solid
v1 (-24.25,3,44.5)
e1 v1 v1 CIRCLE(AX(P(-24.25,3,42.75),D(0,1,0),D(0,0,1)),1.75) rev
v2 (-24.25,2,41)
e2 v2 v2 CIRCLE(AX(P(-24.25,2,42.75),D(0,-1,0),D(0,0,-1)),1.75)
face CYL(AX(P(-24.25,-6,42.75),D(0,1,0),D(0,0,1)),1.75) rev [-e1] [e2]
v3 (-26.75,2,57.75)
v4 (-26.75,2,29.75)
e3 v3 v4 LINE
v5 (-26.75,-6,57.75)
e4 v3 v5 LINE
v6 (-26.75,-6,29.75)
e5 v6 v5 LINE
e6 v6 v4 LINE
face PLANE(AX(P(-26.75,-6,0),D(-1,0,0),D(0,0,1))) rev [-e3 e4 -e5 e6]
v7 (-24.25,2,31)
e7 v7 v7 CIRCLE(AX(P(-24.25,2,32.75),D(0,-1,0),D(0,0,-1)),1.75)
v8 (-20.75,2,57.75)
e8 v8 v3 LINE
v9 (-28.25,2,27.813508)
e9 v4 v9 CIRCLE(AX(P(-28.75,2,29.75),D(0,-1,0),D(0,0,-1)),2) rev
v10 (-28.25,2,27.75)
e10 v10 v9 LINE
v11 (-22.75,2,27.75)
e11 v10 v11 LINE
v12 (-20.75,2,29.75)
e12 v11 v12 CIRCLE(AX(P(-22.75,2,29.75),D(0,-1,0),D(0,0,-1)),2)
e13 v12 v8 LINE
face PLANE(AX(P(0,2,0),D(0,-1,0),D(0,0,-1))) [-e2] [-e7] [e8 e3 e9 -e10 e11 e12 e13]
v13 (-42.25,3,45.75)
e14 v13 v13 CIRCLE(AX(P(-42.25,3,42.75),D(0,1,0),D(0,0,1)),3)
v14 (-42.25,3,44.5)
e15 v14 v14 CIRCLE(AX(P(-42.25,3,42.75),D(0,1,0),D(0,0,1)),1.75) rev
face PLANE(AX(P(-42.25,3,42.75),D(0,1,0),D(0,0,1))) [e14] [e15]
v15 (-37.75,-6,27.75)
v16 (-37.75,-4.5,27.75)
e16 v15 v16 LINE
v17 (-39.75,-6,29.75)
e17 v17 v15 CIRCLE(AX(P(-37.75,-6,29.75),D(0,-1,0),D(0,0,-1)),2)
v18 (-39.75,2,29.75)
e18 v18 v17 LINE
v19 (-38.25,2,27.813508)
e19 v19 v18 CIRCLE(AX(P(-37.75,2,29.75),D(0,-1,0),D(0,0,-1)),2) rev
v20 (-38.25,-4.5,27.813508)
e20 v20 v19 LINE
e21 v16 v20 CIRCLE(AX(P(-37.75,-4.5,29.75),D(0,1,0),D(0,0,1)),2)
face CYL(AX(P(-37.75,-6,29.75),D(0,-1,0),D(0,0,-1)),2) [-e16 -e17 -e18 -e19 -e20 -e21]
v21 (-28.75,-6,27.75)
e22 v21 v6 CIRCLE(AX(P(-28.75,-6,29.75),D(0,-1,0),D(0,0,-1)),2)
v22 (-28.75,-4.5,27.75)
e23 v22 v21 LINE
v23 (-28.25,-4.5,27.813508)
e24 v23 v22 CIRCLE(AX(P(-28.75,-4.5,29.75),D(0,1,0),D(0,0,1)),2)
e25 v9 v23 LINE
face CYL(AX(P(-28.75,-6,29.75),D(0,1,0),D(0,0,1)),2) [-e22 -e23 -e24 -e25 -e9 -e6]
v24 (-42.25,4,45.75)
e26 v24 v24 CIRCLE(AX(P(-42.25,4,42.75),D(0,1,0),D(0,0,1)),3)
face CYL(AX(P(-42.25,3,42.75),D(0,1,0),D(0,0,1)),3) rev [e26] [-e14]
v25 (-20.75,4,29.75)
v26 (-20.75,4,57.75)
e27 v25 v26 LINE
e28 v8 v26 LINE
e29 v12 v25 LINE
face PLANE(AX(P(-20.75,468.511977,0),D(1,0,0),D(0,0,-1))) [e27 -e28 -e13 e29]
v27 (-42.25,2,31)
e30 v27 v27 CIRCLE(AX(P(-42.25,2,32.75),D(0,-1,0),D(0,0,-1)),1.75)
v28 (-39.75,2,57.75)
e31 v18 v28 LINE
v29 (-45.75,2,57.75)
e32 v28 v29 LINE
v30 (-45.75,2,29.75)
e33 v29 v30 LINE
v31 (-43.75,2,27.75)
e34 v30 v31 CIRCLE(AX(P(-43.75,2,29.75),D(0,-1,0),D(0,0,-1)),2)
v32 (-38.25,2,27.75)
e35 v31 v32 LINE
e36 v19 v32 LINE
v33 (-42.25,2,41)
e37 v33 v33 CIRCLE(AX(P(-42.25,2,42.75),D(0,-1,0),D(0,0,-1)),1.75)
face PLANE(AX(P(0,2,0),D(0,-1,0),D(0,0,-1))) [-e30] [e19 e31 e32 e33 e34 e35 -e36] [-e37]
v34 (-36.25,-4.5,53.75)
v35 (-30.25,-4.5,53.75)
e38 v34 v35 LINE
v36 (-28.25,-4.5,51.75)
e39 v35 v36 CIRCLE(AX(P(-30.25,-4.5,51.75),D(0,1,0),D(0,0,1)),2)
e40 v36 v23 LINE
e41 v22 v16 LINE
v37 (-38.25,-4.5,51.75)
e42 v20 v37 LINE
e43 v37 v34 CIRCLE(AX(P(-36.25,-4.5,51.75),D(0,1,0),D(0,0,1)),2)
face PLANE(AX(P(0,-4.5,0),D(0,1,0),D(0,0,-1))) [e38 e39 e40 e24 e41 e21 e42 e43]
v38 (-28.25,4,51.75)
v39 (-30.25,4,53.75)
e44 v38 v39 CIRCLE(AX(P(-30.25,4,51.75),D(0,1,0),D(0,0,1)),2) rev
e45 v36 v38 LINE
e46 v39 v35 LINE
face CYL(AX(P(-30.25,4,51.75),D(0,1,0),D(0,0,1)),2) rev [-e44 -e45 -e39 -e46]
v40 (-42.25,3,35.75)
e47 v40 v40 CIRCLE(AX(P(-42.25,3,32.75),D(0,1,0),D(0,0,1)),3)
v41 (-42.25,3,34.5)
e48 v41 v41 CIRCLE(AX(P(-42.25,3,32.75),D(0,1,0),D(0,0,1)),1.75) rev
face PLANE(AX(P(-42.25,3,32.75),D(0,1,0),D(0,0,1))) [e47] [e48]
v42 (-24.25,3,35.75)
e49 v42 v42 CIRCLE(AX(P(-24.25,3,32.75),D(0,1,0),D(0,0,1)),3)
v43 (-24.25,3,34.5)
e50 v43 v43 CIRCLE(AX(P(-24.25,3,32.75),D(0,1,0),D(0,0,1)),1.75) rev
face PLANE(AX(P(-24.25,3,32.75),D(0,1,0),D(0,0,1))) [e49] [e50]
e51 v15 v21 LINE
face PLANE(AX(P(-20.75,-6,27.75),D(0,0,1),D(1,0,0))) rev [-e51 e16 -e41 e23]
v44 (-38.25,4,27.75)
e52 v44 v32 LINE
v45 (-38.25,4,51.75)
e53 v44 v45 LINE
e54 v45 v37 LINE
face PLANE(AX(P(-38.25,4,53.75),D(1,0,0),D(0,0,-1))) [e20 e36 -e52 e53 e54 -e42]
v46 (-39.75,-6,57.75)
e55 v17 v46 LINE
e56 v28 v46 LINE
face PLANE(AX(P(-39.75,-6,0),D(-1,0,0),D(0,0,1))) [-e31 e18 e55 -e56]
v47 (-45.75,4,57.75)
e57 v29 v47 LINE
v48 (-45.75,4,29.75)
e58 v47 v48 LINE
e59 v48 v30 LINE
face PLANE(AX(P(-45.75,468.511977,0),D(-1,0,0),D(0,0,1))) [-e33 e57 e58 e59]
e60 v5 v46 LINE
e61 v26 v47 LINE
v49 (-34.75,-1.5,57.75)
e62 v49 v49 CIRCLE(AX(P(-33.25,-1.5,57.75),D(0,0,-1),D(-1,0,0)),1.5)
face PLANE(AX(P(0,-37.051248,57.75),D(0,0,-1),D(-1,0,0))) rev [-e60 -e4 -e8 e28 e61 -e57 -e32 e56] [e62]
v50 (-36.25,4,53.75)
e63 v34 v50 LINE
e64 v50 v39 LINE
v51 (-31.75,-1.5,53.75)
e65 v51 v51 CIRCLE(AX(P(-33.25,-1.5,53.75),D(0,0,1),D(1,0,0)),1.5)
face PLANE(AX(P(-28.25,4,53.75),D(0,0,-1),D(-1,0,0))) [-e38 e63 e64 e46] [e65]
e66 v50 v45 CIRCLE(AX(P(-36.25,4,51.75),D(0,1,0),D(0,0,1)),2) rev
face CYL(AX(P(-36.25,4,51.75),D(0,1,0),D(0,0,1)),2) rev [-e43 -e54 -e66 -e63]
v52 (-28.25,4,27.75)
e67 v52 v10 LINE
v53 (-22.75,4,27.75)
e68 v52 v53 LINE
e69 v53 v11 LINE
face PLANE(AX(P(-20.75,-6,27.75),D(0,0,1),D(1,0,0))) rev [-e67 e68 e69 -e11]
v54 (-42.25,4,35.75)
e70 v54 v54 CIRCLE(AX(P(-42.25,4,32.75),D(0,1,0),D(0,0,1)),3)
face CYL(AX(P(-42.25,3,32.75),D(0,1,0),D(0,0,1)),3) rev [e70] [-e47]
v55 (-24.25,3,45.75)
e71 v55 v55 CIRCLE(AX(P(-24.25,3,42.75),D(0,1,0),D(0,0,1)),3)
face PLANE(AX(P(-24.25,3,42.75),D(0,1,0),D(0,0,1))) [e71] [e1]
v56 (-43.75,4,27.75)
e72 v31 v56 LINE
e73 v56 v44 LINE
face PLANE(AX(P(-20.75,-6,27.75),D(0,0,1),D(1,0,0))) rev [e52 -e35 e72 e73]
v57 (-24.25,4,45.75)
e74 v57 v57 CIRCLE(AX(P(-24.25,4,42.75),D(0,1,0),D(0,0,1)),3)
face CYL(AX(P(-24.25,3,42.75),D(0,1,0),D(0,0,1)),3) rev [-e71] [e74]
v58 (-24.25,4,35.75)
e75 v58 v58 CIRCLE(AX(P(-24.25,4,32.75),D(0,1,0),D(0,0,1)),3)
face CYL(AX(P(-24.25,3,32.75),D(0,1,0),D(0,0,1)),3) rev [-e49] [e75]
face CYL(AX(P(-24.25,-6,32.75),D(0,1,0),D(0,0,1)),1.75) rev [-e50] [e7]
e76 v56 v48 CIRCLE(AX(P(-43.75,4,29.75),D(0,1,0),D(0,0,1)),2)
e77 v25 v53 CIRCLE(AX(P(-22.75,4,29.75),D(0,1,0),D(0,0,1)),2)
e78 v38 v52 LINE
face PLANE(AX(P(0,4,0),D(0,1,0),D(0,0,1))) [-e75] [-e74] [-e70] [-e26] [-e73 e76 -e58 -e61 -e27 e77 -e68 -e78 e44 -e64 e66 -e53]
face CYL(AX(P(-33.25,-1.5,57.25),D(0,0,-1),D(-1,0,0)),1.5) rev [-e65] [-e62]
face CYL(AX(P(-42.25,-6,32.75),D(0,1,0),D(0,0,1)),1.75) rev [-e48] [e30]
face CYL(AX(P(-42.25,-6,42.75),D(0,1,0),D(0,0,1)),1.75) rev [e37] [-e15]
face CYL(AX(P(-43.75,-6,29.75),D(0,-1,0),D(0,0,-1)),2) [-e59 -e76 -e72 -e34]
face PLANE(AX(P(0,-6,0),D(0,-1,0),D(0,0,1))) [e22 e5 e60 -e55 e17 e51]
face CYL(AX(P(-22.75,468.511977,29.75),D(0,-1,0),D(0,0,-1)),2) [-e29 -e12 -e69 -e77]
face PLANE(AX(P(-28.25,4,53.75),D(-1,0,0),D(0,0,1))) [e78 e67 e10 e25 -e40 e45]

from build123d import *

# Parameters (mm, degrees)
SKETCH_1_W           = 35
SKETCH_1_H           = 55
EXTRUDE_1_DEPTH      = 1
EXTRUDE_2_DEPTH      = 3
SKETCH_3_R           = 5
CUT_EXTRUDE_1_DEPTH  = 169.569903897
SKETCH_4_R           = 4
CUT_EXTRUDE_2_DEPTH  = 2
SKETCH_5_R           = 2
CUT_EXTRUDE_3_DEPTH  = 2
EXTRUDE_START        = 7
EXTRUDE_3_DEPTH      = 7
CUT_EXTRUDE_START    = -1.5
SKETCH_9_W           = 10
SKETCH_9_H           = 26
CUT_EXTRUDE_4_DEPTH  = 168.318874833
SKETCH_10_R          = 1.5
CUT_EXTRUDE_5_DEPTH  = 194.595583627
SKETCH_11_W          = 338.377402865
SKETCH_11_H          = 318.232792562
CUT_EXTRUDE_6_DEPTH  = 10
SKETCH_12_W          = 33.023791835
SKETCH_12_H          = 7.5
CUT_EXTRUDE_7_DEPTH  = 74.963673636
CUT_EXTRUDE_START_2  = 9
CUT_EXTRUDE_8_DEPTH  = 10
EXTRUDE_START_2      = -2
EXTRUDE_4_DEPTH      = 2
EXTRUDE_5_DEPTH      = 8
SKETCH_16_R          = 1.5
CUT_EXTRUDE_9_DEPTH  = 53.962840747
SKETCH_17_R          = 1.75
CUT_EXTRUDE_10_DEPTH = 10
SKETCH_18_R          = 3
CUT_EXTRUDE_11_DEPTH = 1
FILLET_1_R           = 2
FILLET_2_R           = 2
FILLET_3_R           = 2
FILLET_4_R           = 2


with BuildPart() as part:
    # 草图1 → 凸台-拉伸1 (new body)
    with BuildSketch(Plane(origin=(0, 0, 0), x_dir=(1, 0, 0), z_dir=(0, 1, 0))):
        Rectangle(SKETCH_1_W, SKETCH_1_H)
    extrude(amount=EXTRUDE_1_DEPTH)

    # 草图2 → 凸台-拉伸2 (add)
    with BuildSketch(Plane(origin=(0, 1, 0), x_dir=(1, 0, 0), z_dir=(0, 1, 0))):
        with BuildLine():
            Line((106.75, -2.25), (106.75, 2.25))
            Line((106.75, 2.25), (121.75, 2.25))
            ThreePointArc((121.75, 2.25), (122.922125199, 2.352547667), (124.058635967, 2.65707481))
            Line((124.058635967, 2.65707481), (154.058635967, 13.576181838))
            ThreePointArc((154.058635967, 13.576181838), (158.397452333, 21.091232227), (151.75, 26.669107028))
            Line((151.75, 26.669107028), (-31.447415548, 57.101298968))
            ThreePointArc((-31.447415548, 57.101298968), (-37.800418235, 56.264673928), (-42.609265279, 52.029632639))
            Line((-42.609265279, 52.029632639), (-60.161792173, 23.605896086))
            ThreePointArc((-60.161792173, 23.605896086), (-61.717833724, 20.073278016), (-62.25, 16.25))
            Line((-62.25, 16.25), (-62.25, -16.25))
            ThreePointArc((-62.25, -16.25), (-61.717833724, -20.073278016), (-60.161792173, -23.605896086))
            Line((-60.161792173, -23.605896086), (-42.609265279, -52.029632639))
            ThreePointArc((-42.609265279, -52.029632639), (-37.800418235, -56.264673928), (-31.447415548, -57.101298968))
            Line((-31.447415548, -57.101298968), (151.75, -26.669107028))
            ThreePointArc((151.75, -26.669107028), (158.397452333, -21.091232227), (154.058635967, -13.576181838))
            Line((154.058635967, -13.576181838), (124.058635967, -2.65707481))
            ThreePointArc((124.058635967, -2.65707481), (122.922125199, -2.352547667), (121.75, -2.25))
            Line((121.75, -2.25), (106.75, -2.25))
        make_face()
    extrude(amount=EXTRUDE_2_DEPTH)

    # 草图3 → 切除-拉伸1 (cut, through all)
    with BuildSketch(Plane(origin=(0, 4, 0), x_dir=(1, 0, 0), z_dir=(0, 1, 0))):
        with Locations(Location((-48.25, 16.25, 0), (0, 0, 270))):
            Circle(SKETCH_3_R)
        with Locations(Location((-48.25, -16.25, 0), (0, 0, 270))):
            Circle(SKETCH_3_R)
    extrude(amount=-CUT_EXTRUDE_1_DEPTH, mode=Mode.SUBTRACT)

    # 草图4 → 切除-拉伸2 (cut)
    with BuildSketch(Plane(origin=(0, 4, 0), x_dir=(1, 0, 0), z_dir=(0, 1, 0))):
        with Locations(Location((-33.25, 46.25, 0), (0, 0, 270))):
            Circle(SKETCH_4_R)
        with Locations(Location((-33.25, -46.25, 0), (0, 0, 270))):
            Circle(SKETCH_4_R)
    extrude(amount=-CUT_EXTRUDE_2_DEPTH, mode=Mode.SUBTRACT)

    # 草图5 → 切除-拉伸3 (cut)
    with BuildSketch(Plane(origin=(0, 4, 0), x_dir=(1, 0, 0), z_dir=(0, 1, 0))):
        with Locations(Location((121.75, 9, 0), (0, 0, 270))):
            Circle(SKETCH_5_R)
        with Locations(Location((121.75, -9, 0), (0, 0, 270))):
            Circle(SKETCH_5_R)
        with Locations(Location((151.75, 19.919107028, 0), (0, 0, 270))):
            Circle(SKETCH_5_R)
        with Locations(Location((151.75, -19.919107028, 0), (0, 0, 270))):
            Circle(SKETCH_5_R)
    extrude(amount=-CUT_EXTRUDE_3_DEPTH, mode=Mode.SUBTRACT)

    # 草图8 → 凸台-拉伸3 (add)
    with BuildSketch(Plane.XZ.offset(-1).offset(EXTRUDE_START)):
        with BuildLine():
            Line((-26.75, -26.25), (-39.75, -26.25))
            Line((-39.75, -26.25), (-39.75, -55.124119675))
            ThreePointArc((-39.75, -55.124119675), (-35.798281322, -56.950759894), (-31.447415548, -57.101298968))
            Line((-31.447415548, -57.101298968), (-26.75, -56.320978726))
            Line((-26.75, -56.320978726), (-26.75, -26.25))
        make_face()
    extrude_3 = extrude(amount=-EXTRUDE_3_DEPTH)

    # 镜向1: 凸台-拉伸3 across plane
    add(extrude_3.mirror(Plane.XY))

    # 草图9 → 切除-拉伸4 (cut, through all)
    with BuildSketch(Plane.XZ.offset(6).offset(CUT_EXTRUDE_START)):
        with Locations((-33.25, -40.75)):
            Rectangle(SKETCH_9_W, SKETCH_9_H)
    cut_extrude_4 = extrude(amount=-CUT_EXTRUDE_4_DEPTH, mode=Mode.SUBTRACT)

    # 镜向2: 切除-拉伸4 across plane
    add(cut_extrude_4.mirror(Plane.XY), mode=Mode.SUBTRACT)

    # 草图10 → 切除-拉伸5 (cut, through all)
    with BuildSketch(Plane.XY.offset(-53.75)):
        with Locations((-33.25, -1.5)):
            Circle(SKETCH_10_R)
    cut_extrude_5 = extrude(amount=-CUT_EXTRUDE_5_DEPTH, mode=Mode.SUBTRACT)

    # 镜向3: 切除-拉伸5 across plane
    add(cut_extrude_5.mirror(Plane.XY), mode=Mode.SUBTRACT)

    # 草图11 → 切除-拉伸6 (cut)
    with BuildSketch(Plane.XZ.offset(6)):
        with Locations((33.683140033, 0)):
            Rectangle(SKETCH_11_W, SKETCH_11_H)
        with BuildLine():
            ThreePointArc((-30.464187664, 63.020189314), (-38.770685795, 62.328620225), (-45.75, 57.771718622))
            Line((-45.75, 57.771718622), (-45.75, 20.25))
            Line((-45.75, 20.25), (-20.75, 20.25))
            Line((-20.75, 20.25), (-20.75, 61.406498299))
            Line((-20.75, 61.406498299), (-30.464187664, 63.020189314))
        make_face(mode=Mode.SUBTRACT)
    extrude(amount=-CUT_EXTRUDE_6_DEPTH, mode=Mode.SUBTRACT)

    # 草图12 → 切除-拉伸7 (cut, through all)
    with BuildSketch(Plane(origin=(0, 4, 0), x_dir=(1, 0, 0), z_dir=(0, 1, 0))):
        with Locations((-37.261895917, -24)):
            Rectangle(SKETCH_12_W, SKETCH_12_H)
    extrude(amount=-CUT_EXTRUDE_7_DEPTH, mode=Mode.SUBTRACT)

    # 草图13 → 切除-拉伸8 (cut)
    with BuildSketch(Plane.XZ.offset(-1).offset(CUT_EXTRUDE_START_2)):
        Polygon((-26.75, 56.320978726), (-26.75, 27.75), (-20.75, 27.75), (-20.75, 55.324277157), align=None)
        with BuildLine():
            Line((-45.75, 46.943674541), (-45.75, 27.75))
            Line((-45.75, 27.75), (-39.75, 27.75))
            Line((-39.75, 27.75), (-39.75, 55.124119675))
            ThreePointArc((-39.75, 55.124119675), (-41.329172996, 53.715049478), (-42.609265279, 52.029632639))
            Line((-42.609265279, 52.029632639), (-45.75, 46.943674541))
        make_face()
    extrude(amount=-CUT_EXTRUDE_8_DEPTH, mode=Mode.SUBTRACT)

    # 草图14 → 凸台-拉伸4 (add)
    with BuildSketch(Plane(origin=(0, 4, 0), x_dir=(1, 0, 0), z_dir=(0, 1, 0)).offset(EXTRUDE_START_2)):
        with BuildLine():
            Line((-38.25, -53.75), (-38.25, -27.75))
            Line((-38.25, -27.75), (-45.75, -27.75))
            Line((-45.75, -27.75), (-45.75, -46.943674541))
            Line((-45.75, -46.943674541), (-42.609265279, -52.029632639))
            ThreePointArc((-42.609265279, -52.029632639), (-37.800418235, -56.264673928), (-31.447415548, -57.101298968))
            Line((-31.447415548, -57.101298968), (-20.75, -55.324277157))
            Line((-20.75, -55.324277157), (-20.75, -27.75))
            Line((-20.75, -27.75), (-28.25, -27.75))
            Line((-28.25, -27.75), (-28.25, -53.75))
            Line((-28.25, -53.75), (-38.25, -53.75))
        make_face()
        with BuildLine():
            Line((-20.75, -57.75), (-20.75, -55.324277157))
            Line((-20.75, -55.324277157), (-31.447415548, -57.101298968))
            ThreePointArc((-31.447415548, -57.101298968), (-37.800418235, -56.264673928), (-42.609265279, -52.029632639))
            Line((-42.609265279, -52.029632639), (-45.75, -46.943674541))
            Line((-45.75, -46.943674541), (-45.75, -57.75))
            Line((-45.75, -57.75), (-20.75, -57.75))
        make_face()
    extrude(amount=EXTRUDE_4_DEPTH)

    # 草图15 → 凸台-拉伸5 (add)
    with BuildSketch(Plane.XZ.offset(6)):
        with BuildLine():
            Line((-39.75, 55.124119675), (-39.75, 57.75))
            Line((-39.75, 57.75), (-26.75, 57.75))
            Line((-26.75, 57.75), (-26.75, 56.320978726))
            Line((-26.75, 56.320978726), (-31.447415548, 57.101298968))
            ThreePointArc((-31.447415548, 57.101298968), (-35.798281322, 56.950759894), (-39.75, 55.124119675))
        make_face()
    extrude(amount=-EXTRUDE_5_DEPTH)

    # 草图16 → 切除-拉伸9 (cut, through all)
    with BuildSketch(Plane(origin=(0, 0, 53.75), x_dir=(-1, 0, 0), z_dir=(0, 0, -1))):
        with Locations((33.25, -1.5)):
            Circle(SKETCH_16_R)
    extrude(amount=-CUT_EXTRUDE_9_DEPTH, mode=Mode.SUBTRACT)

    # 草图17 → 切除-拉伸10 (cut)
    with BuildSketch(Plane(origin=(0, 4, 0), x_dir=(1, 0, 0), z_dir=(0, 1, 0))):
        with Locations(Location((-24.25, -32.75, 0), (0, 0, 270))):
            Circle(SKETCH_17_R)
        with Locations(Location((-24.25, -42.75, 0), (0, 0, 270))):
            Circle(SKETCH_17_R)
        with Locations(Location((-42.25, -42.75, 0), (0, 0, 270))):
            Circle(SKETCH_17_R)
        with Locations(Location((-42.25, -32.75, 0), (0, 0, 270))):
            Circle(SKETCH_17_R)
    extrude(amount=-CUT_EXTRUDE_10_DEPTH, mode=Mode.SUBTRACT)

    # 草图18 → 切除-拉伸11 (cut)
    with BuildSketch(Plane(origin=(0, 4, 0), x_dir=(1, 0, 0), z_dir=(0, 1, 0))):
        with Locations(Location((-42.25, -32.75, 0), (0, 0, 270))):
            Circle(SKETCH_18_R)
        with Locations(Location((-24.25, -32.75, 0), (0, 0, 270))):
            Circle(SKETCH_18_R)
        with Locations(Location((-24.25, -42.75, 0), (0, 0, 270))):
            Circle(SKETCH_18_R)
        with Locations(Location((-42.25, -42.75, 0), (0, 0, 270))):
            Circle(SKETCH_18_R)
    extrude(amount=-CUT_EXTRUDE_11_DEPTH, mode=Mode.SUBTRACT)

    # 圆角1
    # the kernel refuses this fillet: 2 mm, written as the material it takes off along each edge
    with BuildSketch(Plane(origin=(-39.75, 2, 27.75), x_dir=(1, 0, 0), z_dir=(0, -1, 0))) as fillet_1_piece_1:
        with BuildLine():
            CenterArc((FILLET_1_R, FILLET_1_R), FILLET_1_R, 180, 90)
            Line((0, FILLET_1_R), (0, 0))
            Line((0, 0), (FILLET_1_R, 0))
        make_face()
    extrude(amount=13, mode=Mode.SUBTRACT)

    # 圆角2
    fillet_2_edges = [part.edges().sort_by_distance(p)[0] for p in [
        (-45.75, 3, 27.75),
        (-20.75, 3, 27.75),
    ]]
    fillet(fillet_2_edges, radius=FILLET_2_R)

    # 圆角3
    # the kernel refuses this fillet: 2 mm, written as the material it takes off along each edge
    with BuildSketch(Plane(origin=(-26.75, -11, 27.75), x_dir=(-1, 0, 0), z_dir=(0, 1, 0))) as fillet_3_piece_1:
        with BuildLine():
            CenterArc((FILLET_3_R, FILLET_3_R), FILLET_3_R, 180, 90)
            Line((0, FILLET_3_R), (0, 0))
            Line((0, 0), (FILLET_3_R, 0))
        make_face()
    extrude(amount=13, mode=Mode.SUBTRACT)

    # 圆角4
    fillet_4_edges = [part.edges().sort_by_distance(p)[0] for p in [
        (-28.25, -0.25, 53.75),
        (-38.25, -0.25, 53.75),
    ]]
    fillet(fillet_4_edges, radius=FILLET_4_R)


solid = part.part
